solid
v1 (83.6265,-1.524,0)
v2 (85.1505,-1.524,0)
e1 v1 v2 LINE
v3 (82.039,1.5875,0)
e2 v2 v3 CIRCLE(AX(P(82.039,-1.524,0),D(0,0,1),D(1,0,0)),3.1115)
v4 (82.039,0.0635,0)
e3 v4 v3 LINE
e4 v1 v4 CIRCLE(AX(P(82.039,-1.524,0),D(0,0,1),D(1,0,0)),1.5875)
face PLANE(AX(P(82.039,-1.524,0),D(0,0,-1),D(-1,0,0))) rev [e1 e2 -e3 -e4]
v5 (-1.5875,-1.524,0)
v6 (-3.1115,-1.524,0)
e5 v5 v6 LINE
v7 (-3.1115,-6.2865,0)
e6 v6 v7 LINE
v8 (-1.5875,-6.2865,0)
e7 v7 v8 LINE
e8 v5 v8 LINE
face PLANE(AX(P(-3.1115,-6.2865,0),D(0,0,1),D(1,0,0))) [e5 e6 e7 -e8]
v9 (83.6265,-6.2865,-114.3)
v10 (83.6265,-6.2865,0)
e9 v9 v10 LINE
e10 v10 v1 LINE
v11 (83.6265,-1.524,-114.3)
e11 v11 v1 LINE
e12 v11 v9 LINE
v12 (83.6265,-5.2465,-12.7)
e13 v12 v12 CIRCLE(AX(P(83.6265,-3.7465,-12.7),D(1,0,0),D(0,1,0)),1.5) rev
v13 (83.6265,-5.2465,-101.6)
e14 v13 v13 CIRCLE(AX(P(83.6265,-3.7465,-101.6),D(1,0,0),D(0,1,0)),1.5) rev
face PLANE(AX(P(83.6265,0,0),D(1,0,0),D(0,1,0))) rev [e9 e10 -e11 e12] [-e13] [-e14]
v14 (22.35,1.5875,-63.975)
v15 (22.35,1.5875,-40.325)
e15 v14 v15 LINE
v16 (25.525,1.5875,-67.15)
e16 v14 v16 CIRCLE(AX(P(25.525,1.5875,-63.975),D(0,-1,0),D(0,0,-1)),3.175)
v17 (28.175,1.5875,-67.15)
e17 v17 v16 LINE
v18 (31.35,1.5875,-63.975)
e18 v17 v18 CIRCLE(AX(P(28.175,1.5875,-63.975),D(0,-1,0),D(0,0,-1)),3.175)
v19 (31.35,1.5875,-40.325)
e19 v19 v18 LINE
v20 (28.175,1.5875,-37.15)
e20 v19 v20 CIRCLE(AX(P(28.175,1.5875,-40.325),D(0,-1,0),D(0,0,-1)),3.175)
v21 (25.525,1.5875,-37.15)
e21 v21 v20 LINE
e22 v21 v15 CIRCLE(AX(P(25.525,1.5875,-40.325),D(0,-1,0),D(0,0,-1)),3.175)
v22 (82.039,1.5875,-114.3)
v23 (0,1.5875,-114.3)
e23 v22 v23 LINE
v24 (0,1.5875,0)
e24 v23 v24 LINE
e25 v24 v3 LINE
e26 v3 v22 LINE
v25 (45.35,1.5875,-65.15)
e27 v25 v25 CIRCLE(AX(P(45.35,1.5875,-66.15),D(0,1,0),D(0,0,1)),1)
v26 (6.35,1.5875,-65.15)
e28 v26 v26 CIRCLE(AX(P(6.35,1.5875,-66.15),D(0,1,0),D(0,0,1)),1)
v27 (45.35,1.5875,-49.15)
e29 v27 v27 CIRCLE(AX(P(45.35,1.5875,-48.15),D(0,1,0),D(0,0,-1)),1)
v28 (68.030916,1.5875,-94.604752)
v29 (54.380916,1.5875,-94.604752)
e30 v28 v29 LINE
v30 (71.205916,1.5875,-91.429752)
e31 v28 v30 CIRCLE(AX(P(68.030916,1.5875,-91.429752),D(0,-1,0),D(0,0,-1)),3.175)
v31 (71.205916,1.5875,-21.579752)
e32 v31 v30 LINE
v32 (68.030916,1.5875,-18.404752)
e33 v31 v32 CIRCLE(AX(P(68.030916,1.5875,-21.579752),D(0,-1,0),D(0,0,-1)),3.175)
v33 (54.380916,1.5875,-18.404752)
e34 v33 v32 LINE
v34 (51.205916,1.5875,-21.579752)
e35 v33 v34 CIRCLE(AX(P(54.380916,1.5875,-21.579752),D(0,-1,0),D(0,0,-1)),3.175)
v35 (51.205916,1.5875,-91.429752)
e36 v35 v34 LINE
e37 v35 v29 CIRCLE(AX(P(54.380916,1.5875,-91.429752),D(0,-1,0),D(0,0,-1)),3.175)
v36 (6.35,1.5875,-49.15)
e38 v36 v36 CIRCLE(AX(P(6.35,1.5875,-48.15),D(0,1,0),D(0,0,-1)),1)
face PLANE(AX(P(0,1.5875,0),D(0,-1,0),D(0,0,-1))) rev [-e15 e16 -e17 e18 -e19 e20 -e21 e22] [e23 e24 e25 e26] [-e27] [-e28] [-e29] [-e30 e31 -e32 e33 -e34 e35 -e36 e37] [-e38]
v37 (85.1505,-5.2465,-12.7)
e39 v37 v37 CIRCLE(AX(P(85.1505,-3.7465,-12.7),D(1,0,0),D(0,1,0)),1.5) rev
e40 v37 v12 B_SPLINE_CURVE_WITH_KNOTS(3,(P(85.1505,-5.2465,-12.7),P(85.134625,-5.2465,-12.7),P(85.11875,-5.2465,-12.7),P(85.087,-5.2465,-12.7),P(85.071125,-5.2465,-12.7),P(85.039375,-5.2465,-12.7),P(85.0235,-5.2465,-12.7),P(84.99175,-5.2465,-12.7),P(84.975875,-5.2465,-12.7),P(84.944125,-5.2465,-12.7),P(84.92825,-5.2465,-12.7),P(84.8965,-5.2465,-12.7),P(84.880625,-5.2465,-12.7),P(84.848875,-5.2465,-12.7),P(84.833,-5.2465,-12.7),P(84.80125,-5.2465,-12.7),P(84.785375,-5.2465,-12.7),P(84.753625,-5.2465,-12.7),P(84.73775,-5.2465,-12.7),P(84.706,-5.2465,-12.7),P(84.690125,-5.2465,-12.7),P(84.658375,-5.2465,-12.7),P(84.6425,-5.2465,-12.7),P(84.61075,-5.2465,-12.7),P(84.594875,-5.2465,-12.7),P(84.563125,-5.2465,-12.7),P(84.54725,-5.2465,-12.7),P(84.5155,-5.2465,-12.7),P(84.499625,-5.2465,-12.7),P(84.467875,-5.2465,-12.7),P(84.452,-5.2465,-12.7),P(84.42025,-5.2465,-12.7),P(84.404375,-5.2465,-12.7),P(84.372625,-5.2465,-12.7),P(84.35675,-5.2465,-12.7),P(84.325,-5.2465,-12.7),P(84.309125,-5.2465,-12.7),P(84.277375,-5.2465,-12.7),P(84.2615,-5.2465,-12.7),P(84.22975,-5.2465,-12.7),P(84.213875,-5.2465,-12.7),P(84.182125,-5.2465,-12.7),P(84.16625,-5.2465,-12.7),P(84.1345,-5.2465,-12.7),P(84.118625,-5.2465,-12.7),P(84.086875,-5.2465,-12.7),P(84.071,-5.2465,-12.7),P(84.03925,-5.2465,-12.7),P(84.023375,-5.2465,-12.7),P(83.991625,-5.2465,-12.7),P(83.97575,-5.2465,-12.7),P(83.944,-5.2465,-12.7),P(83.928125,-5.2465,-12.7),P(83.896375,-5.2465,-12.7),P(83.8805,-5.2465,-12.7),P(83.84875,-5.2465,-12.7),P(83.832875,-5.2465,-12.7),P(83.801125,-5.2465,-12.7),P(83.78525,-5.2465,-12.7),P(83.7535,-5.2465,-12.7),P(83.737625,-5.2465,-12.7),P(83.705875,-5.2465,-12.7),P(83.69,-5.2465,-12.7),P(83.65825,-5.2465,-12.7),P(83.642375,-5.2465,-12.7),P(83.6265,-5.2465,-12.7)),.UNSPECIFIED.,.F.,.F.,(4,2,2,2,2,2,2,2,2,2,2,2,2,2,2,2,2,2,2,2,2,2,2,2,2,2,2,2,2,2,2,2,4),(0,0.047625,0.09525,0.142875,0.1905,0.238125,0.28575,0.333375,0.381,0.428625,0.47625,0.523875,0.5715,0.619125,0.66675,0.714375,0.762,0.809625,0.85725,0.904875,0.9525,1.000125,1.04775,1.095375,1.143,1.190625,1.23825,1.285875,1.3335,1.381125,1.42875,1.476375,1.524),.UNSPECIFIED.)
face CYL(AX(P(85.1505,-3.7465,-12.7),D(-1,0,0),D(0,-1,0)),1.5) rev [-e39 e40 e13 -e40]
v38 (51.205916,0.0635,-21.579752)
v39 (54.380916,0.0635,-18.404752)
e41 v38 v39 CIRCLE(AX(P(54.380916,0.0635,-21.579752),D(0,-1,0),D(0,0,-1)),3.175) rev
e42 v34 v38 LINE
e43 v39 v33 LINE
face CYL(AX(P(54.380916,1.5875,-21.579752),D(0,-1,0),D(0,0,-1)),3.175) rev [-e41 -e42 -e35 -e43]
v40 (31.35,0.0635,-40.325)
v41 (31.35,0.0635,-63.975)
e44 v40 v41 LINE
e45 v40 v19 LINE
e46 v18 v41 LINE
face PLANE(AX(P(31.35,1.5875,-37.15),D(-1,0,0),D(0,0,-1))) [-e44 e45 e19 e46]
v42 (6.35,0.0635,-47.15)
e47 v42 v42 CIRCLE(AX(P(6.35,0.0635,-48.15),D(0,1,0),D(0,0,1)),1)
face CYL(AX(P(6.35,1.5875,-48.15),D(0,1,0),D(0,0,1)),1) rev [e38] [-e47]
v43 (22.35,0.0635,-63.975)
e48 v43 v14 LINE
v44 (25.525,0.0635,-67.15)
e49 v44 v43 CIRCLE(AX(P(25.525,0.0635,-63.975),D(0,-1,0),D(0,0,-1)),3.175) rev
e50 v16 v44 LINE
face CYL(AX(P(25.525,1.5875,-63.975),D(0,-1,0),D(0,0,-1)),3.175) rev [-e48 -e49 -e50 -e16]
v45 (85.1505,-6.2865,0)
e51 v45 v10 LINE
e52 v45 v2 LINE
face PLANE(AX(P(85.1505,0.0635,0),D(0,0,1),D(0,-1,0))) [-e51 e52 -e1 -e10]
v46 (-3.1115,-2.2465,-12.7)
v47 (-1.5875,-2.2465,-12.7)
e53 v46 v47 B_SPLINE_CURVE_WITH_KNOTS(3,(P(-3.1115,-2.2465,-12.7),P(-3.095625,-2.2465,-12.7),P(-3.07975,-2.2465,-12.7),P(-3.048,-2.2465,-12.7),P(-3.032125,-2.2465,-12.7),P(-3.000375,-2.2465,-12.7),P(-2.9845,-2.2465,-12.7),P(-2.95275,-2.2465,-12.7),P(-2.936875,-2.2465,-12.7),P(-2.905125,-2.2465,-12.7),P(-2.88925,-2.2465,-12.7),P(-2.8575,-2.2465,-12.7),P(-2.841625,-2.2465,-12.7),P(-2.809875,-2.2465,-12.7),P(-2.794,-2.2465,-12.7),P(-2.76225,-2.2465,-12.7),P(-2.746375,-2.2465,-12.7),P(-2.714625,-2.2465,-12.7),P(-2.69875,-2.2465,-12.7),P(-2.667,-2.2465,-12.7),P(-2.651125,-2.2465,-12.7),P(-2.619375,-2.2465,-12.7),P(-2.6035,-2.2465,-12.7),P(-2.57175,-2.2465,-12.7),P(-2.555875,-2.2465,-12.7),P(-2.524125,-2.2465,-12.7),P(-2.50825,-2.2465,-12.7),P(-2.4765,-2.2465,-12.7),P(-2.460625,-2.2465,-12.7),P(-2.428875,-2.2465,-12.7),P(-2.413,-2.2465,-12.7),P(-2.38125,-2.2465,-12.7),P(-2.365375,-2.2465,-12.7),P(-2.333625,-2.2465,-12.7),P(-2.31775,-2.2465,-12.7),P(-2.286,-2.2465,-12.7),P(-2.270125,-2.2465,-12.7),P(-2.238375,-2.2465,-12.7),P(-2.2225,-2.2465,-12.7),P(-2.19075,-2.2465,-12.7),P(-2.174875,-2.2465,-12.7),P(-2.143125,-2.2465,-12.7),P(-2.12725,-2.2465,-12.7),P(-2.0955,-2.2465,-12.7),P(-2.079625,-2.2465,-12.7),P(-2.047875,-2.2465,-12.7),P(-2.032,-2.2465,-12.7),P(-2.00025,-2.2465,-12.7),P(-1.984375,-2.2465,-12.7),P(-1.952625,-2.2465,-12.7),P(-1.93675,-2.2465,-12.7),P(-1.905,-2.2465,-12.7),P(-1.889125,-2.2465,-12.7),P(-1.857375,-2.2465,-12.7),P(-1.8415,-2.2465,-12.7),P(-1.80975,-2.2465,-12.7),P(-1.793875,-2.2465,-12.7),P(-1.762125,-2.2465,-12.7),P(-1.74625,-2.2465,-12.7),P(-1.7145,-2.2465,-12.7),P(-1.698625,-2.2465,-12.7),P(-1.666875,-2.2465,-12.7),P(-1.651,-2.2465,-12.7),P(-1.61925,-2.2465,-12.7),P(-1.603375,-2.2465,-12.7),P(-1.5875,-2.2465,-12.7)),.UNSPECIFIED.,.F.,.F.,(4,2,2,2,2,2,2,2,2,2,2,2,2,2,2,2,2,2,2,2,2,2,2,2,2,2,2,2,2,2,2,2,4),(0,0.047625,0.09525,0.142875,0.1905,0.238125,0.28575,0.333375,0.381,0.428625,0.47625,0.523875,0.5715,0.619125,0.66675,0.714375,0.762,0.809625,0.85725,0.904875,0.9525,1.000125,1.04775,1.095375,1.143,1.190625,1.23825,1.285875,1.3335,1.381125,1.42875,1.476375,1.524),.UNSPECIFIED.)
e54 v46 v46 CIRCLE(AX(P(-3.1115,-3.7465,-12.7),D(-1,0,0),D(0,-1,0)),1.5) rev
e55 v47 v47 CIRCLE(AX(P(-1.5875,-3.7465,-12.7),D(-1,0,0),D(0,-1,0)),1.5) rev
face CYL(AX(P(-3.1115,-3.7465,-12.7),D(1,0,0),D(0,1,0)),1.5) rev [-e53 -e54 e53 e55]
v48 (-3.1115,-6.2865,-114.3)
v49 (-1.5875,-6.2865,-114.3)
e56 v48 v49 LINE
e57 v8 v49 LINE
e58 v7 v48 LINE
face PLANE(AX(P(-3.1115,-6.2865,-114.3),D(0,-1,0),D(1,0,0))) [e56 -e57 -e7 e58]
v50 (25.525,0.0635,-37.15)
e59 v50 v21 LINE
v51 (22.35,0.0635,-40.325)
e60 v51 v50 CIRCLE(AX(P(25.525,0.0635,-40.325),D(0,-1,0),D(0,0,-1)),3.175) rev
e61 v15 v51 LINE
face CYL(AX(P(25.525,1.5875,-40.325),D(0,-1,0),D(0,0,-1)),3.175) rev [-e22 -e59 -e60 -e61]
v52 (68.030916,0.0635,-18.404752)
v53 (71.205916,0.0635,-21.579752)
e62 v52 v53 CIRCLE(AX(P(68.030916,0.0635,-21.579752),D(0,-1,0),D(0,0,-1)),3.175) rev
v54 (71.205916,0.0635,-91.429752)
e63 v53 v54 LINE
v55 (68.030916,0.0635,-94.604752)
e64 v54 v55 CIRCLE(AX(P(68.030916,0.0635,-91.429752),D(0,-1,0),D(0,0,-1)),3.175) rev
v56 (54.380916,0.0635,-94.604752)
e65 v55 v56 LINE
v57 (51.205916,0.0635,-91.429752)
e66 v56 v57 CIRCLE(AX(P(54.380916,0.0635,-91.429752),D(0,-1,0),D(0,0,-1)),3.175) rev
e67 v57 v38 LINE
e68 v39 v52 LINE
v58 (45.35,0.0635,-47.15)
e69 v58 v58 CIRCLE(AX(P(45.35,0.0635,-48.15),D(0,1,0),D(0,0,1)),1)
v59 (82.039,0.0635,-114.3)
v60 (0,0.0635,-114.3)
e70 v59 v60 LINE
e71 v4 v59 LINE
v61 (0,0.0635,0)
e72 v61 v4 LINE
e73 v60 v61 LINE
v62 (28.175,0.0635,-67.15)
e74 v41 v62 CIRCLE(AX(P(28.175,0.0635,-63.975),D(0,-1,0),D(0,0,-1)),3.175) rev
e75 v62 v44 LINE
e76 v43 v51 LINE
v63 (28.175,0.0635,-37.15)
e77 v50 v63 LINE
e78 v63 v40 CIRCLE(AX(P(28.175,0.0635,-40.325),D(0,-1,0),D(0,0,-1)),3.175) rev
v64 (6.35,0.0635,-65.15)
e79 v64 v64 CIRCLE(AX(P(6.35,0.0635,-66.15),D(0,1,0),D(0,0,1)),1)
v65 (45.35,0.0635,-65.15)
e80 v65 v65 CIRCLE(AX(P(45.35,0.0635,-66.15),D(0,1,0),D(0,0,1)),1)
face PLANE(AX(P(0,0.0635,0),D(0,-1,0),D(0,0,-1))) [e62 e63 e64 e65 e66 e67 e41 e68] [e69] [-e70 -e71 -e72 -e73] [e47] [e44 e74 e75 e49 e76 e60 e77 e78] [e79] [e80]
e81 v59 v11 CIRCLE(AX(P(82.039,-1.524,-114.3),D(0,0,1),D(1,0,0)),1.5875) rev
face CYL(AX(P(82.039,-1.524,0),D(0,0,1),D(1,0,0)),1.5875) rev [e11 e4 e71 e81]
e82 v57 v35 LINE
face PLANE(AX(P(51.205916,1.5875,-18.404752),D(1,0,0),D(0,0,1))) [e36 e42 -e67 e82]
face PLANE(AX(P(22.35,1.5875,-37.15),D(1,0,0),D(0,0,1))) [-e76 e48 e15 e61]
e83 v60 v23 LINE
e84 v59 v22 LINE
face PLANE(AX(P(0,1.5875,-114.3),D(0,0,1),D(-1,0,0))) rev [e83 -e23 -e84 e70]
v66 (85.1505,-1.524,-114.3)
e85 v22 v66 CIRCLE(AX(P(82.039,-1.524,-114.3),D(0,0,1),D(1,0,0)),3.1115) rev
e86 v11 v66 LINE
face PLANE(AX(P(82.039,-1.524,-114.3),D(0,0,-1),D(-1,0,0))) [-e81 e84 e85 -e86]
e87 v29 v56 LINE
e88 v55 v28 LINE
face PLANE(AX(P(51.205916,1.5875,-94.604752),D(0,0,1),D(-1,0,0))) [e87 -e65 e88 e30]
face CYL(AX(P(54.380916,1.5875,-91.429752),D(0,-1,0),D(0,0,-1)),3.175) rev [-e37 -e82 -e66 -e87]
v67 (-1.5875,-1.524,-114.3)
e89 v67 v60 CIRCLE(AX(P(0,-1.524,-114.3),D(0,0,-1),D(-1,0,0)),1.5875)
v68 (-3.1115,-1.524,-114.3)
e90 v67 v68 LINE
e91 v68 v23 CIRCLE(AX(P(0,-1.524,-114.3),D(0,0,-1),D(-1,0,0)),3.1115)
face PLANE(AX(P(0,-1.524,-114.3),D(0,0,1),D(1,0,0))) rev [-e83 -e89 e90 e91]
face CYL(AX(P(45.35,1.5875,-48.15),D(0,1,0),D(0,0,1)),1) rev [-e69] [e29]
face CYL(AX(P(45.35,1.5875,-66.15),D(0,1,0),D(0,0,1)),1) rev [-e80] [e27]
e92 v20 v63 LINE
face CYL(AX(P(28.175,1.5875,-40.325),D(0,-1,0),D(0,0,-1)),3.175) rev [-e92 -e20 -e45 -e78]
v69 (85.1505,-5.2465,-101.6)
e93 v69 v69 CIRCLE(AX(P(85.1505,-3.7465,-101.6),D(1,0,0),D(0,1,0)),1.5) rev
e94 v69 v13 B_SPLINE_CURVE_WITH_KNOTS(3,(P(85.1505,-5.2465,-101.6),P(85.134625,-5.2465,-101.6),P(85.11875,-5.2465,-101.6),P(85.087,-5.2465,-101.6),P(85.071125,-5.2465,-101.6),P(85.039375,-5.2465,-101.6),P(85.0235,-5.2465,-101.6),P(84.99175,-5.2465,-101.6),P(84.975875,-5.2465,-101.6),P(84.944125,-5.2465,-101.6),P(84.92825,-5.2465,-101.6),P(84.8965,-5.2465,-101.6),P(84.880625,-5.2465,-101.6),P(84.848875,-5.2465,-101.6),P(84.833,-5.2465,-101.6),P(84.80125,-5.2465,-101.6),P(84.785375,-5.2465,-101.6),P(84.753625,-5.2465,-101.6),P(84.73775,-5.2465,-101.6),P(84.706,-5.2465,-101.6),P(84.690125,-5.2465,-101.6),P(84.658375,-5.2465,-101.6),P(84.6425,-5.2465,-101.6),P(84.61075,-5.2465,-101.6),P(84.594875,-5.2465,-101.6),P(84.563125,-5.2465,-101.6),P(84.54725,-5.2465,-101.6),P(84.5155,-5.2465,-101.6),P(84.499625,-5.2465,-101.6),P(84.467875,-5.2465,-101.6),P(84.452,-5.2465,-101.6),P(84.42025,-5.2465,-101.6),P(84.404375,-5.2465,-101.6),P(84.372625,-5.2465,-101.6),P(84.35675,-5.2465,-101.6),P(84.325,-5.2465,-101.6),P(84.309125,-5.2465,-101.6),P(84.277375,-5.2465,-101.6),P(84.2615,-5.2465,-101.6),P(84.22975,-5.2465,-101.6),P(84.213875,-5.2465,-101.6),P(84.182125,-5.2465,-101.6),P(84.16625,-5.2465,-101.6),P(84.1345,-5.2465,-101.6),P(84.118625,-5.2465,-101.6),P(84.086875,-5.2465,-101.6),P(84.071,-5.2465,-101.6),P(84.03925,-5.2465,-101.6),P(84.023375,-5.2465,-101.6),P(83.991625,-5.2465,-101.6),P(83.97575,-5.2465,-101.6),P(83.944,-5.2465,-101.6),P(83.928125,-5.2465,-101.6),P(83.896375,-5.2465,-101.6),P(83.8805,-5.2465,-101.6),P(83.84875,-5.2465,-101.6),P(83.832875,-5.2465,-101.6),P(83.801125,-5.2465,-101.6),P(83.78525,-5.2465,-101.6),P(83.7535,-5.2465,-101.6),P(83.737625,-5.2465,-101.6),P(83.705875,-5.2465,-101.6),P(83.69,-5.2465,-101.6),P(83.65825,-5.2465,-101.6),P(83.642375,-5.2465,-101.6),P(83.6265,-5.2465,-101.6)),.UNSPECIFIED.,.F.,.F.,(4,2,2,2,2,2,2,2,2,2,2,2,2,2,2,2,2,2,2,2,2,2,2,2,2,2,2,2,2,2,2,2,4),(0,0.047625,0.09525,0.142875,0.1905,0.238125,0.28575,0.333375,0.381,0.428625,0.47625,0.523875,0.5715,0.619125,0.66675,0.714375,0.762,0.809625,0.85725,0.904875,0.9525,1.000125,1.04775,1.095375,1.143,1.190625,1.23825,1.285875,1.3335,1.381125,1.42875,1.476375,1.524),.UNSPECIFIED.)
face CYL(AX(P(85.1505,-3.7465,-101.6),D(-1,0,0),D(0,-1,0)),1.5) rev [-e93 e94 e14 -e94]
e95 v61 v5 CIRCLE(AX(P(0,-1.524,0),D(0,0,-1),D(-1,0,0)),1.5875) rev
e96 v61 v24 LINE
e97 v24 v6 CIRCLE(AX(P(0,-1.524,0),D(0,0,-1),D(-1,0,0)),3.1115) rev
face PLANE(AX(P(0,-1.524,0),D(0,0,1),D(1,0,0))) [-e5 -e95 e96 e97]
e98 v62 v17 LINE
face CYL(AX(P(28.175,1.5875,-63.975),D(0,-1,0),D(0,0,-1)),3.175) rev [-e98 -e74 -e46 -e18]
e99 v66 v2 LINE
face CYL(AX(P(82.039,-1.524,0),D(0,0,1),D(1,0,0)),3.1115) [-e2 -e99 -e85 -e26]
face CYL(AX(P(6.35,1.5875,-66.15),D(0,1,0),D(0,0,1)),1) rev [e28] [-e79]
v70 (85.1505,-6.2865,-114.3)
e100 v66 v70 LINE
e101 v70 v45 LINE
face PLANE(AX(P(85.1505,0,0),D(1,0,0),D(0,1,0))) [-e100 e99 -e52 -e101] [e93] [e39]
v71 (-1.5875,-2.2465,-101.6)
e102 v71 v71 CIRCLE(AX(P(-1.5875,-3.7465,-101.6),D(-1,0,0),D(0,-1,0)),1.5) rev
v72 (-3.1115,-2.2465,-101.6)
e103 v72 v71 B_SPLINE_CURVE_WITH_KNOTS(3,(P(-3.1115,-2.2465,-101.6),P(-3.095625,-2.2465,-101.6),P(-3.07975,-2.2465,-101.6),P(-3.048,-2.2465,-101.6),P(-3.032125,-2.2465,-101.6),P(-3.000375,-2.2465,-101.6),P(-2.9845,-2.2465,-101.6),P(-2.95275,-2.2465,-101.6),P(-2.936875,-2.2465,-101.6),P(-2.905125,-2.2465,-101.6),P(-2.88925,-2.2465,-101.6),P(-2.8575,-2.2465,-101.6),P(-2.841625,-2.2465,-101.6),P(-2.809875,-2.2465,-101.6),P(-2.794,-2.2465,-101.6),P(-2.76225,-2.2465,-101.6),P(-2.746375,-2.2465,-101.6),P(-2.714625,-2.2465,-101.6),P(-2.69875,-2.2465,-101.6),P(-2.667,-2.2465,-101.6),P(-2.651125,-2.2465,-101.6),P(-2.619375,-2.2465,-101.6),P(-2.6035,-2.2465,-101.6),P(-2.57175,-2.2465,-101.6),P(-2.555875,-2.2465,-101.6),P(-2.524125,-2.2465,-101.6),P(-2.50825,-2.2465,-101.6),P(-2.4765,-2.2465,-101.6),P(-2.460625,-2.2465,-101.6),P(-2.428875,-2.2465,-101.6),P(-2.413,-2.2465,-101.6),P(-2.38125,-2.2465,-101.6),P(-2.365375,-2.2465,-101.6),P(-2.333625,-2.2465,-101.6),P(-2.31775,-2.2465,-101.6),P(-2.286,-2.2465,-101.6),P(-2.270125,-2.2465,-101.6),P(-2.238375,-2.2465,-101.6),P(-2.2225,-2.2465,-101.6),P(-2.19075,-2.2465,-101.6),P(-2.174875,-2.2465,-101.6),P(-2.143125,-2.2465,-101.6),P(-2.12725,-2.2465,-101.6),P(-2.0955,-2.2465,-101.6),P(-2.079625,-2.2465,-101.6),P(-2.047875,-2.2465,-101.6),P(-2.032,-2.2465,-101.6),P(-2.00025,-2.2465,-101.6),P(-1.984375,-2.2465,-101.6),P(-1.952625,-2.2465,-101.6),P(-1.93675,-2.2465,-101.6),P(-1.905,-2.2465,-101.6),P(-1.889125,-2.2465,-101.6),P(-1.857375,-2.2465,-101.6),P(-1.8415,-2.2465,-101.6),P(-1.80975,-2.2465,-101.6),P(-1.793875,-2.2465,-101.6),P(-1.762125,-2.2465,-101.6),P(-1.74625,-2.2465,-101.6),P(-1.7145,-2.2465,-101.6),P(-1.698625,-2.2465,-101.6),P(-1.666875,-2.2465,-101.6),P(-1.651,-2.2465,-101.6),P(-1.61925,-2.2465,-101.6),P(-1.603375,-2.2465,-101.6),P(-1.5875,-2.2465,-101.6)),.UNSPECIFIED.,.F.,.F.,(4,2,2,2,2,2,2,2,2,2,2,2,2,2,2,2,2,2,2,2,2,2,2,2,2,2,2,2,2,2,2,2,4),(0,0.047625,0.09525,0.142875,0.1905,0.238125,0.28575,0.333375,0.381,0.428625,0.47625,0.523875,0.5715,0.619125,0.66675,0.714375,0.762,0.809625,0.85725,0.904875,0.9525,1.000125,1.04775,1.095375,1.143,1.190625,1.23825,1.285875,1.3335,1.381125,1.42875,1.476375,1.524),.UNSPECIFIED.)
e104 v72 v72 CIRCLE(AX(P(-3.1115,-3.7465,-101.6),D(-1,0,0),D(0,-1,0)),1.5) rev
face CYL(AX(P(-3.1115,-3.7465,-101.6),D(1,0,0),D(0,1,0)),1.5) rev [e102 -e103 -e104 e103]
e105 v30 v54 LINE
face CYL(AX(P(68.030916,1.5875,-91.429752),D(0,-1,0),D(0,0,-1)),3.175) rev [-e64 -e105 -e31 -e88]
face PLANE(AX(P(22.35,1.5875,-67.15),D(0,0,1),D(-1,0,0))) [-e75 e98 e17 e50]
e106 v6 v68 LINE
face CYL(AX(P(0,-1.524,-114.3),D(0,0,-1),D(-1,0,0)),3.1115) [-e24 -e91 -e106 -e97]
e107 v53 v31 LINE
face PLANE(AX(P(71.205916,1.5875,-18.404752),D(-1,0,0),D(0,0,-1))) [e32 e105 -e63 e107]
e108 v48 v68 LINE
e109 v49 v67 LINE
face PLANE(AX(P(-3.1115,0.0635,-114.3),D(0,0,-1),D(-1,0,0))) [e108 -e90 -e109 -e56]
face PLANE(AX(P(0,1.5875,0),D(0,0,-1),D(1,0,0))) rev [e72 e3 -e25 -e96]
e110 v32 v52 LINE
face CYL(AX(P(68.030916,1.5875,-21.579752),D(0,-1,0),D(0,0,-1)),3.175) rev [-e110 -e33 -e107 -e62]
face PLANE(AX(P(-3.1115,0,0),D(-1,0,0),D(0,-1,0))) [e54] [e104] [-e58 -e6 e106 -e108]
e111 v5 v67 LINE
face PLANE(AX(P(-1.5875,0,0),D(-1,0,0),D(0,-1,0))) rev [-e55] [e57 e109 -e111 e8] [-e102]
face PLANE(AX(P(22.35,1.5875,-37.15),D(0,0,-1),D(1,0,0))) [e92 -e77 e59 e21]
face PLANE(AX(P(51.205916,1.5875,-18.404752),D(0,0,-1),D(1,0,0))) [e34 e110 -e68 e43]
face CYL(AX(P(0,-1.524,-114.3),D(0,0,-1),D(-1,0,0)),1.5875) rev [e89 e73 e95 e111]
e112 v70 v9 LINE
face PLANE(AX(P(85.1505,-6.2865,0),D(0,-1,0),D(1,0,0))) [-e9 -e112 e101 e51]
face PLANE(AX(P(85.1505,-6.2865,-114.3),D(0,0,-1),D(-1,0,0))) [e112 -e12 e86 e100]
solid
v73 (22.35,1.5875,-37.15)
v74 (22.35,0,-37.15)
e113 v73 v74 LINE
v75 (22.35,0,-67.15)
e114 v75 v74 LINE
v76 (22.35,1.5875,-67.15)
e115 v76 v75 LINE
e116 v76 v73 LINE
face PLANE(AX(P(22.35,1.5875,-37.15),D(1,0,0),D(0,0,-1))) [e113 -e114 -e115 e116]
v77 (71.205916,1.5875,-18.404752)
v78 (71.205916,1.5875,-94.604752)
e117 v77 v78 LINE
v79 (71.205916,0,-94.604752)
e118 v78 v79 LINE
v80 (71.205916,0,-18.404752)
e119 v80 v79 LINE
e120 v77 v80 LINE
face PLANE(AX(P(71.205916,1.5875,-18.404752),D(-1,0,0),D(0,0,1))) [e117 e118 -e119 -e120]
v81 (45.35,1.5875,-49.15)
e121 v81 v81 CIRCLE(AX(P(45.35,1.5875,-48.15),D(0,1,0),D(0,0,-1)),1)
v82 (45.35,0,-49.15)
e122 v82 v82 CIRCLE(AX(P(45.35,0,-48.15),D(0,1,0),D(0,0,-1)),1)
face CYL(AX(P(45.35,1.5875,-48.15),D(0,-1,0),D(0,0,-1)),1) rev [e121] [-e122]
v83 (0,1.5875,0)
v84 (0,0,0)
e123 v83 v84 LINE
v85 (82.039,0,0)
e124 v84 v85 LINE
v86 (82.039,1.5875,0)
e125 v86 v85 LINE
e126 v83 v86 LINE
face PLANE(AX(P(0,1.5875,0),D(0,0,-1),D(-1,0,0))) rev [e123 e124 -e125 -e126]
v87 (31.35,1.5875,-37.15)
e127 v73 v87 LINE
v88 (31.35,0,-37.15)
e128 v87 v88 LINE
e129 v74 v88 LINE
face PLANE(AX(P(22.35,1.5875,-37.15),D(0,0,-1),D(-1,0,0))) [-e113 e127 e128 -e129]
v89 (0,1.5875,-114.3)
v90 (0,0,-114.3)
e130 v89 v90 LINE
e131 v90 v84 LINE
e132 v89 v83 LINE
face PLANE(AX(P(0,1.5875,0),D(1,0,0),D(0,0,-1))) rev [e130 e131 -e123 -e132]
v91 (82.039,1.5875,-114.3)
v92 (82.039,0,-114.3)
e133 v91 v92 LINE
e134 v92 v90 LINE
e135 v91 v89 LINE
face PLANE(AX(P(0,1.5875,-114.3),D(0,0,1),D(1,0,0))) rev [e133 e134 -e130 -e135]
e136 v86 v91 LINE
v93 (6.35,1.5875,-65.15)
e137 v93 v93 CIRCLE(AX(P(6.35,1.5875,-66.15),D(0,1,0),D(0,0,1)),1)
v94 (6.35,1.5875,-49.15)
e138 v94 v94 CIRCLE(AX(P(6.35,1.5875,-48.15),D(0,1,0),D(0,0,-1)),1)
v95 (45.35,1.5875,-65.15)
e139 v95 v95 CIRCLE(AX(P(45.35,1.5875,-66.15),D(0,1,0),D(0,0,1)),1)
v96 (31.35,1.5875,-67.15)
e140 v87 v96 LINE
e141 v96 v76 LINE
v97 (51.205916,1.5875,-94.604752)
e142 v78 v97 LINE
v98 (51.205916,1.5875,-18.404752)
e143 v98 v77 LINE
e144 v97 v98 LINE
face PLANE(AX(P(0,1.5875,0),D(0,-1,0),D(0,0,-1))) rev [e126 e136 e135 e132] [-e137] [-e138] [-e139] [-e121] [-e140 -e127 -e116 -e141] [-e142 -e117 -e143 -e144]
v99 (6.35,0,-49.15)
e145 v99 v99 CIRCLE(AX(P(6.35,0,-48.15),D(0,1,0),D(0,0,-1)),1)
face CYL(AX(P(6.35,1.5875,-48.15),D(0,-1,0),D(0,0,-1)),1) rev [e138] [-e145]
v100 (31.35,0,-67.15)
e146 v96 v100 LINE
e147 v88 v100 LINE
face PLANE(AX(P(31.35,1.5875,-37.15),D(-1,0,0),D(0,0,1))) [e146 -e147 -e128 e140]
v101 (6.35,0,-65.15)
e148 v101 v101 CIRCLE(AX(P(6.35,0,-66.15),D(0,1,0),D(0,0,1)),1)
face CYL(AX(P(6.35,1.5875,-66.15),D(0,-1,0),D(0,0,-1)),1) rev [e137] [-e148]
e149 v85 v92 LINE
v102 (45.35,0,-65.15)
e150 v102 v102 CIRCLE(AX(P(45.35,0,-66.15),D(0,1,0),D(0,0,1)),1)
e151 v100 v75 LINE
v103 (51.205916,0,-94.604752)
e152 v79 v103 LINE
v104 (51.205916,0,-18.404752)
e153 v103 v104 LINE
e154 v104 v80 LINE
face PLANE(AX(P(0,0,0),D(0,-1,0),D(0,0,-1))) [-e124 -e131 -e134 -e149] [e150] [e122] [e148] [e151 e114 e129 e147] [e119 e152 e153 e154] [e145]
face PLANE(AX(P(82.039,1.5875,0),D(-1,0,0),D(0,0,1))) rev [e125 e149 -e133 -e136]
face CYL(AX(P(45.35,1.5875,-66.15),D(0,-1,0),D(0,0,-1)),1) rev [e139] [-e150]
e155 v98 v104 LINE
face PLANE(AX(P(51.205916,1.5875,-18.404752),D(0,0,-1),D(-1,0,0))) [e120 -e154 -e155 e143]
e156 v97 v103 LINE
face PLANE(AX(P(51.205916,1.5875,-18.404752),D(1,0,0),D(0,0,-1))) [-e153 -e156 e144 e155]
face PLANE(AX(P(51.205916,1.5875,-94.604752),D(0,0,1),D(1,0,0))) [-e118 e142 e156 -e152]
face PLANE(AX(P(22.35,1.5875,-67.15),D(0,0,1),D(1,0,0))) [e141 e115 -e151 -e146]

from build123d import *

# Parameters (mm, degrees)
ESQUISSE1_W                      = 82.039
ESQUISSE1_H                      = 114.3
ESQUISSE1_R                      = 1
ESQUISSE1_W_2                    = 20
ESQUISSE1_H_2                    = 76.2
ESQUISSE1_W_3                    = 9
ESQUISSE1_H_3                    = 30
BOSS_EXTRU_1_DEPTH               = 1.5875
CONVERTIR_VOLUME1_START          = 0.0635
CONVERTIR_VOLUME1_OUTLINE_W      = 82.039
CONVERTIR_VOLUME1_OUTLINE_H      = 114.3
CONVERTIR_VOLUME1_OUTLINE_R      = 1
CONVERTIR_VOLUME1_OUTLINE_W_2    = 9
CONVERTIR_VOLUME1_OUTLINE_H_2    = 30
CONVERTIR_VOLUME1_OUTLINE_W_3    = 20
CONVERTIR_VOLUME1_OUTLINE_H_3    = 76.2
CONVERTIR_VOLUME1_DEPTH          = 1.524
T_LE_PLI_E_SUR_AR_TE1_DEPTH      = 114.3
T_LE_START                       = -1.524
T_LE_PLI_E_SUR_AR_TE1_PROFILE_W  = 114.3
T_LE_PLI_E_SUR_AR_TE1_PROFILE_H  = 4.7625
T_LE_PLI_E_SUR_AR_TE1_PROFILE_R  = 1.5
T_LE_PLI_E_SUR_AR_TE1_FLAT_DEPTH = 1.524
T_LE_PLI_E_SUR_AR_TE4_DEPTH      = 114.3
T_LE_PLI_E_SUR_AR_TE4_PROFILE_W  = 114.3
T_LE_PLI_E_SUR_AR_TE4_PROFILE_H  = 4.7625
T_LE_PLI_E_SUR_AR_TE4_PROFILE_R  = 1.5
T_LE_PLI_E_SUR_AR_TE4_FLAT_DEPTH = 1.524
CONG_1_R                         = 3.175


with BuildPart() as part:
    # Esquisse1 → Boss.-Extru.1 (new body)
    with BuildSketch(Plane(origin=(0, 0, 0), x_dir=(1, 0, 0), z_dir=(0, 1, 0))):
        with Locations((41.0195, 57.15)):
            Rectangle(ESQUISSE1_W, ESQUISSE1_H)
        with Locations(Location((6.35, 66.15, 0), (0, 0, 270))):
            Circle(ESQUISSE1_R, mode=Mode.SUBTRACT)
        with Locations(Location((45.35, 66.15, 0), (0, 0, 270))):
            Circle(ESQUISSE1_R, mode=Mode.SUBTRACT)
        with Locations(Location((45.35, 48.15, 0), (0, 0, 90))):
            Circle(ESQUISSE1_R, mode=Mode.SUBTRACT)
        with Locations(Location((6.35, 48.15, 0), (0, 0, 90))):
            Circle(ESQUISSE1_R, mode=Mode.SUBTRACT)
        with Locations((61.205916091, 56.504752132)):
            Rectangle(ESQUISSE1_W_2, ESQUISSE1_H_2, mode=Mode.SUBTRACT)
        with Locations((26.85, 52.15)):
            Rectangle(ESQUISSE1_W_3, ESQUISSE1_H_3, mode=Mode.SUBTRACT)
    extrude(amount=BOSS_EXTRU_1_DEPTH)


with BuildPart() as body_2:
    # Convertir-Volume1: read off the stored shape, not the designer's step
    # Convertir-Volume1 outline → Convertir-Volume1 (new body)
    with BuildSketch(Plane(origin=(0, 0, 0), x_dir=(1, 0, 0), z_dir=(0, 1, 0)).offset(CONVERTIR_VOLUME1_START)):
        with Locations((41.0195, 57.15)):
            Rectangle(CONVERTIR_VOLUME1_OUTLINE_W, CONVERTIR_VOLUME1_OUTLINE_H)
        with Locations((6.35, 48.15)):
            Circle(CONVERTIR_VOLUME1_OUTLINE_R, mode=Mode.SUBTRACT)
        with Locations((26.85, 52.15)):
            Rectangle(CONVERTIR_VOLUME1_OUTLINE_W_2, CONVERTIR_VOLUME1_OUTLINE_H_2, mode=Mode.SUBTRACT)
        with Locations((45.35, 48.15)):
            Circle(CONVERTIR_VOLUME1_OUTLINE_R, mode=Mode.SUBTRACT)
        with Locations((61.205916091, 56.504752132)):
            Rectangle(CONVERTIR_VOLUME1_OUTLINE_W_3, CONVERTIR_VOLUME1_OUTLINE_H_3, mode=Mode.SUBTRACT)
        with Locations((6.35, 66.15)):
            Circle(CONVERTIR_VOLUME1_OUTLINE_R, mode=Mode.SUBTRACT)
        with Locations((45.35, 66.15)):
            Circle(CONVERTIR_VOLUME1_OUTLINE_R, mode=Mode.SUBTRACT)
    extrude(amount=CONVERTIR_VOLUME1_DEPTH)

    # Tôle pliée sur arête1: sheet metal written as solids
    # Tôle pliée sur arête1 bend section (on a plane across the edge) → Tôle pliée sur arête1 (add)
    with BuildSketch(Plane(origin=(-1.5875, 0.0635, 0), x_dir=(1, 0, 0), z_dir=(0, 0, -1))):
        with BuildLine():
            Line((-1.524, 1.5875), (0, 1.5875))
            ThreePointArc((0, 1.5875), (0.464967985, 0.464967985), (1.5875, 0))
            Line((1.5875, 0), (1.5875, -1.524))
            ThreePointArc((1.5875, -1.524), (-0.61266275, -0.61266275), (-1.524, 1.5875))
        make_face()
    extrude(amount=T_LE_PLI_E_SUR_AR_TE1_DEPTH)

    # Tôle pliée sur arête1 profile (on flange) → Tôle pliée sur arête1 flat (add)
    with BuildSketch(Plane(origin=(-1.5875, 0.0635, 0), x_dir=(0, 0, 1), z_dir=(1, 0, 0)).offset(T_LE_START)):
        with Locations((-57.15, 3.96875)):
            Rectangle(T_LE_PLI_E_SUR_AR_TE1_PROFILE_W, T_LE_PLI_E_SUR_AR_TE1_PROFILE_H)
        with Locations((-12.7, 3.81)):
            Circle(T_LE_PLI_E_SUR_AR_TE1_PROFILE_R, mode=Mode.SUBTRACT)
        with Locations((-101.6, 3.81)):
            Circle(T_LE_PLI_E_SUR_AR_TE1_PROFILE_R, mode=Mode.SUBTRACT)
    extrude(amount=T_LE_PLI_E_SUR_AR_TE1_FLAT_DEPTH)

    # Tôle pliée sur arête4: sheet metal written as solids
    # Tôle pliée sur arête4 bend section (on a plane across the edge) → Tôle pliée sur arête4 (add)
    with BuildSketch(Plane(origin=(83.6265, 0.0635, -114.3), x_dir=(-1, 0, 0), z_dir=(0, 0, 1))):
        with BuildLine():
            Line((-1.524, 1.5875), (0, 1.5875))
            ThreePointArc((0, 1.5875), (0.464967985, 0.464967985), (1.5875, 0))
            Line((1.5875, 0), (1.5875, -1.524))
            ThreePointArc((1.5875, -1.524), (-0.61266275, -0.61266275), (-1.524, 1.5875))
        make_face()
    extrude(amount=T_LE_PLI_E_SUR_AR_TE4_DEPTH)

    # Tôle pliée sur arête4 profile (on flange) → Tôle pliée sur arête4 flat (add)
    with BuildSketch(Plane(origin=(83.6265, 0.0635, 0), x_dir=(0, 0, -1), z_dir=(-1, 0, 0)).offset(T_LE_START)):
        with Locations((57.15, 3.96875)):
            Rectangle(T_LE_PLI_E_SUR_AR_TE4_PROFILE_W, T_LE_PLI_E_SUR_AR_TE4_PROFILE_H)
        with Locations((12.7, 3.81)):
            Circle(T_LE_PLI_E_SUR_AR_TE4_PROFILE_R, mode=Mode.SUBTRACT)
        with Locations((101.6, 3.81)):
            Circle(T_LE_PLI_E_SUR_AR_TE4_PROFILE_R, mode=Mode.SUBTRACT)
    extrude(amount=T_LE_PLI_E_SUR_AR_TE4_FLAT_DEPTH)

    # Congé1
    cong_1_edges = [body_2.edges().sort_by_distance(p)[0] for p in [
        (51.205916091, 0.8255, -94.604752132),
        (51.205916091, 0.8255, -18.404752132),
        (71.205916091, 0.8255, -18.404752132),
        (71.205916091, 0.8255, -94.604752132),
        (22.35, 0.8255, -67.15),
        (22.35, 0.8255, -37.15),
        (31.35, 0.8255, -37.15),
        (31.35, 0.8255, -67.15),
    ]]
    fillet(cong_1_edges, radius=CONG_1_R)


solid = Compound([part.part, body_2.part])
